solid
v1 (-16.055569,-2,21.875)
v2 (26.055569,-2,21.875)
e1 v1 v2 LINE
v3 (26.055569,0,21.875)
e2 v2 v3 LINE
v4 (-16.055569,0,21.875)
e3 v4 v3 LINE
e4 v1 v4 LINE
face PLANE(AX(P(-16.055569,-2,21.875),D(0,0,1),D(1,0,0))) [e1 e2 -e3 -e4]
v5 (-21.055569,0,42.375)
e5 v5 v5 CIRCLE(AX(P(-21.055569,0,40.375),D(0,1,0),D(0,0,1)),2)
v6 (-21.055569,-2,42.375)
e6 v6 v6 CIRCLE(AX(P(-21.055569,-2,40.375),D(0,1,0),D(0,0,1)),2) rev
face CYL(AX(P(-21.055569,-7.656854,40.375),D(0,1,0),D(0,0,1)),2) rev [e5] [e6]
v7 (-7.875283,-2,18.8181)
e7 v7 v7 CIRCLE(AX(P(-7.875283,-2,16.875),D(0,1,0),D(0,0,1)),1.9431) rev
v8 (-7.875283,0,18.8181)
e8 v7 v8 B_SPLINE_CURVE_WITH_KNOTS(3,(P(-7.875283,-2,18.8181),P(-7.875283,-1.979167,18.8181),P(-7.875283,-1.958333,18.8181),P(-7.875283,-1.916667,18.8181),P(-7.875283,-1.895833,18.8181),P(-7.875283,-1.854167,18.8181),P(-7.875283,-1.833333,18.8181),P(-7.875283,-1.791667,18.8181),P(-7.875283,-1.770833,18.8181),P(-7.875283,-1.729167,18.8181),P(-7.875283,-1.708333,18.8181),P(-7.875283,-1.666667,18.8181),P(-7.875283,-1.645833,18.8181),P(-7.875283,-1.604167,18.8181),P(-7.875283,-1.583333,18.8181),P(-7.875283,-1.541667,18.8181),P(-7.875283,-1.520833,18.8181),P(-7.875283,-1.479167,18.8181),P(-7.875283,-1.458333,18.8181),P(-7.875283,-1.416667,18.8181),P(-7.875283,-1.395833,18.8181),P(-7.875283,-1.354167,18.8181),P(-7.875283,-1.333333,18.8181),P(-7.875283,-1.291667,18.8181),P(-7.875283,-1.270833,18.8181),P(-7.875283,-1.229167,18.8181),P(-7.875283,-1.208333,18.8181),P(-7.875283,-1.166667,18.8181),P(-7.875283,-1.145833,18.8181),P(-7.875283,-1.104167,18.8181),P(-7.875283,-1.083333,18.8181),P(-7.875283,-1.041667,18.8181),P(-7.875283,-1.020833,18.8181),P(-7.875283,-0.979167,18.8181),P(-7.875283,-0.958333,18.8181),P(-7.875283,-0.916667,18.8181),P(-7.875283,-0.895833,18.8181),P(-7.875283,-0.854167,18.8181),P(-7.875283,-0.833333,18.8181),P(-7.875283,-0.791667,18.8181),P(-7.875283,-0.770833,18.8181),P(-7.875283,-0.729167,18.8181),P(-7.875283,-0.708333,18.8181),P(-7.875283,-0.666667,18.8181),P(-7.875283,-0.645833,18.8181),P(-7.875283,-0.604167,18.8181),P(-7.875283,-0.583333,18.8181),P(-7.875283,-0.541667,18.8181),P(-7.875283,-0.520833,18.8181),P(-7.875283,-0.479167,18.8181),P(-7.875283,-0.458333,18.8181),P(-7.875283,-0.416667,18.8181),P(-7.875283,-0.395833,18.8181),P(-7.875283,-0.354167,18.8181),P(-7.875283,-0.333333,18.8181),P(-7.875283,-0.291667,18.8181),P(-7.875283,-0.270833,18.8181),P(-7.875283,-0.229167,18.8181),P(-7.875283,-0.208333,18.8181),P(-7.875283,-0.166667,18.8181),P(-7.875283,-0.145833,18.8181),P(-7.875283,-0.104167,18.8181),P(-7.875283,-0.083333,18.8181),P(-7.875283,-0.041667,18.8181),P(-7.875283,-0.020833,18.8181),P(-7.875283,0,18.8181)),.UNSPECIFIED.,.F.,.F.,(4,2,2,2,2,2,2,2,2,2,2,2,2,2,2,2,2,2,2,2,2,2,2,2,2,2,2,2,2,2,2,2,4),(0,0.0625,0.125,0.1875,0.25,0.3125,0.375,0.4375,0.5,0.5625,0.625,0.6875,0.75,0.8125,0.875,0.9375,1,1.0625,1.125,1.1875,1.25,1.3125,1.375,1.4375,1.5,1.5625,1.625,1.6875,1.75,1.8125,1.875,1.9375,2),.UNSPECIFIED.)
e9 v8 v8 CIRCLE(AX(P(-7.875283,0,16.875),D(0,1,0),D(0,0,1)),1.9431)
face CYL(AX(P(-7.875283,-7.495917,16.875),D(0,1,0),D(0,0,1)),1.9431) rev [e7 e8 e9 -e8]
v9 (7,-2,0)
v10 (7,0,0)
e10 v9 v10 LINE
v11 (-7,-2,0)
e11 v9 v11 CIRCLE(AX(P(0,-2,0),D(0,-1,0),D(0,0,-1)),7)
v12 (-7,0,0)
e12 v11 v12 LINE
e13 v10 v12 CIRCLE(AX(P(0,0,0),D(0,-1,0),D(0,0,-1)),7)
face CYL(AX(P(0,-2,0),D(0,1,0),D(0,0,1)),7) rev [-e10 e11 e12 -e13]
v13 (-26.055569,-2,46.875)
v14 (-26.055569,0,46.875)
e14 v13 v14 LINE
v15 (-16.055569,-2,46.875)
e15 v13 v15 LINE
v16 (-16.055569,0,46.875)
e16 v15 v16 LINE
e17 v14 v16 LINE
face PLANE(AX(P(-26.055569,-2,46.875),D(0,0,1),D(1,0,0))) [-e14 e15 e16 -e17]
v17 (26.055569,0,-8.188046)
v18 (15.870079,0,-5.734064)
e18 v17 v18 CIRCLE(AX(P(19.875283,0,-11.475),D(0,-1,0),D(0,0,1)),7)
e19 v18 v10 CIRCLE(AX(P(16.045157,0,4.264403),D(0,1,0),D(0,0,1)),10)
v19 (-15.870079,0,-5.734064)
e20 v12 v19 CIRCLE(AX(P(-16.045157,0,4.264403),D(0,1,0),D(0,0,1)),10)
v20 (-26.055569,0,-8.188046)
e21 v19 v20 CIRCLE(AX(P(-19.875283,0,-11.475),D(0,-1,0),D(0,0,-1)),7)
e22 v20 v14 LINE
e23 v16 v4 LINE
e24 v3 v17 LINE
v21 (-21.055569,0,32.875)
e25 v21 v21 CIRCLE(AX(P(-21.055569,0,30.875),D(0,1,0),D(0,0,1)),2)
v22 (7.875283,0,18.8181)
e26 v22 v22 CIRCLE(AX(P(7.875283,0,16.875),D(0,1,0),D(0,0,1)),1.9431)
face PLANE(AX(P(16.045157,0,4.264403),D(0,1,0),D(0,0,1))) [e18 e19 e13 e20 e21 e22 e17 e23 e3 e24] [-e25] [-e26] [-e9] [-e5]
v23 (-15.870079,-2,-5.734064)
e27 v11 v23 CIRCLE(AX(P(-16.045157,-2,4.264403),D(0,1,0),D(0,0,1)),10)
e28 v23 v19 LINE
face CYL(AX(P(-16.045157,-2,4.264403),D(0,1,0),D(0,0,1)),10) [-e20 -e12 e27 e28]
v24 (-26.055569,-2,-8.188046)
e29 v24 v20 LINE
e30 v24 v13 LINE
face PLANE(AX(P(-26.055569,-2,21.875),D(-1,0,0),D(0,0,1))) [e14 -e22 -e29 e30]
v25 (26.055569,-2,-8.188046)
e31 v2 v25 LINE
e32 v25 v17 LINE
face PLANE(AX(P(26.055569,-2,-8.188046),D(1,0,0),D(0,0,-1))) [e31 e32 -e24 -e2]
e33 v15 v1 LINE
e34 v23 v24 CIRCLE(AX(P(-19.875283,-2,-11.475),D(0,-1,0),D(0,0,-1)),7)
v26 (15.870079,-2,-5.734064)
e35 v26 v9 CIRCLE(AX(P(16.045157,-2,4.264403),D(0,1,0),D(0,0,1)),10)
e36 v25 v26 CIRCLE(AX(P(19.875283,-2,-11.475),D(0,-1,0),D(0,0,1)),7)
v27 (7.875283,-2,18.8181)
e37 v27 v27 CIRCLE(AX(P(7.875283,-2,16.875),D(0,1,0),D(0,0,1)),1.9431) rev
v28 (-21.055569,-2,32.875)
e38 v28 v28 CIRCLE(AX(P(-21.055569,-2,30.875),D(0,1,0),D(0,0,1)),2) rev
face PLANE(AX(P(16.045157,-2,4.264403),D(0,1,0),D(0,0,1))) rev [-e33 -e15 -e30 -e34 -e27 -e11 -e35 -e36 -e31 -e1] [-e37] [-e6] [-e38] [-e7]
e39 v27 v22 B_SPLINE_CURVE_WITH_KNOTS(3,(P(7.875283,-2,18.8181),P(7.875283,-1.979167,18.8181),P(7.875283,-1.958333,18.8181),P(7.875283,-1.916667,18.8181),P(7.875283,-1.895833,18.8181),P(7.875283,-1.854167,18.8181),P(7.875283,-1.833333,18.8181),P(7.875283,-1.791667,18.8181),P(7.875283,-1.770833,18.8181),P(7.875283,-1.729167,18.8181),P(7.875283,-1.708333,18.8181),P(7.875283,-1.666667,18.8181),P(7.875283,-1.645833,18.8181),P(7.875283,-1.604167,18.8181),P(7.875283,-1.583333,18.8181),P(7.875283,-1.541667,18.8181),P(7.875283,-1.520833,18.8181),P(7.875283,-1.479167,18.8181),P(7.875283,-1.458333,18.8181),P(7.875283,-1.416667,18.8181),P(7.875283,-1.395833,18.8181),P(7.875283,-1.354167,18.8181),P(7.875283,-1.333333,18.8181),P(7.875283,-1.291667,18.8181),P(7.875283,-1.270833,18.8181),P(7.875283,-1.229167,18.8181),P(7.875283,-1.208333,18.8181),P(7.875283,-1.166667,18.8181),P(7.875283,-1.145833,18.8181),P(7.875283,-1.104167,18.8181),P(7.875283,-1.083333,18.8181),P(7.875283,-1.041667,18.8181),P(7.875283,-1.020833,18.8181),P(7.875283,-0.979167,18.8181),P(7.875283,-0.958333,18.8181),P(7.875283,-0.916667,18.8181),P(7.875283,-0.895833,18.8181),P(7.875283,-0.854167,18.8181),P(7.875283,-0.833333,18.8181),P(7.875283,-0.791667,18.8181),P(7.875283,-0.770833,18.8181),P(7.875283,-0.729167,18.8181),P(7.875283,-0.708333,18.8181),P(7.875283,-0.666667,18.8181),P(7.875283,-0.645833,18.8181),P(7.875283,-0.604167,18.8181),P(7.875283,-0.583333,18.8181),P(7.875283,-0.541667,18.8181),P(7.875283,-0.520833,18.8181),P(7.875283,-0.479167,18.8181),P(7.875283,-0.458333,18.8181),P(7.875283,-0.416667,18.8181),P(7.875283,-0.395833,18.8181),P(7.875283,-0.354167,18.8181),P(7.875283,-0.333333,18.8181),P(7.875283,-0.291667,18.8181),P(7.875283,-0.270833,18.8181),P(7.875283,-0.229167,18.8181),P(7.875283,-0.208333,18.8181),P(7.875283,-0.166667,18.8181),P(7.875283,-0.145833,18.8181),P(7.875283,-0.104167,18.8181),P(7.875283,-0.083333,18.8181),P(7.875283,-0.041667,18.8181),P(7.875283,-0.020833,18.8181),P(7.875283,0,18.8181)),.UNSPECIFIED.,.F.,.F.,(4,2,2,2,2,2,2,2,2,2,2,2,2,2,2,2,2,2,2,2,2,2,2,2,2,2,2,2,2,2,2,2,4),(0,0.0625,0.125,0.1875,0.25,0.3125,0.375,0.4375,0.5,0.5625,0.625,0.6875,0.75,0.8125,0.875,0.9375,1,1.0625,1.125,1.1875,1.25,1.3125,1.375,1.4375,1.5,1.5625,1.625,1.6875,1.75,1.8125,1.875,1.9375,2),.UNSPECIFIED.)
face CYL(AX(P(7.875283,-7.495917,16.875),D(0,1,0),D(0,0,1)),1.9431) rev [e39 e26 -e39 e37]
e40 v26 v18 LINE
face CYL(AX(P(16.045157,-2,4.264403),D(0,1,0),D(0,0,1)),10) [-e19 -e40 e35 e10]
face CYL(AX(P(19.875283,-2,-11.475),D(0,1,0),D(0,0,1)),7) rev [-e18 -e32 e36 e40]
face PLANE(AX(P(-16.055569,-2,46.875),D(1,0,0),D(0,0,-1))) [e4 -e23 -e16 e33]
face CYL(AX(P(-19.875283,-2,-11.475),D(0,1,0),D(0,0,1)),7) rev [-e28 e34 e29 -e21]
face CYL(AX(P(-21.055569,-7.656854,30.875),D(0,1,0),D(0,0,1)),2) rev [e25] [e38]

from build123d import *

# Parameters (mm, degrees)
BASE_FLANGE1_DEPTH = 2
SKETCH7_R          = 2
CUT_EXTRUDE1_DEPTH = 2
SKETCH9_R          = 1.9431
CUT_EXTRUDE2_DEPTH = 2


# Sheet-metal steps are written as plain solids
with BuildPart() as part:
    # Sketch2 → Base-Flange1 (new body)
    with BuildSketch(Plane(origin=(0, 0, 0), x_dir=(1, 0, 0), z_dir=(0, 1, 0))):
        with BuildLine():
            Line((-26.055569119, -21.875), (-26.055569119, -46.875))
            Line((-26.055569119, -46.875), (-16.055569119, -46.875))
            Line((-16.055569119, -46.875), (-16.055569119, -21.875))
            Line((-16.055569119, -21.875), (26.055569119, -21.875))
            Line((26.055569119, -21.875), (26.055569119, 8.188046441))
            ThreePointArc((26.055569119, 8.188046441), (21.514872246, 4.669726518), (15.870079226, 5.73406431))
            ThreePointArc((15.870079226, 5.73406431), (10.616247764, 4.133629141), (7, 0))
            ThreePointArc((7, 0), (0, -7), (-7, 0))
            ThreePointArc((-7, 0), (-10.616247764, 4.133629141), (-15.870079226, 5.73406431))
            ThreePointArc((-15.870079226, 5.73406431), (-21.514872246, 4.669726518), (-26.055569119, 8.188046441))
            Line((-26.055569119, 8.188046441), (-26.055569119, -21.875))
        make_face()
    extrude(amount=-BASE_FLANGE1_DEPTH)

    # Sketch7 → Cut-Extrude1 (cut)
    with BuildSketch(Plane(origin=(0, 0, 0), x_dir=(1, 0, 0), z_dir=(0, 1, 0))):
        with Locations(Location((-21.055569119, -40.375, 0), (0, 0, 270))):
            Circle(SKETCH7_R)
        with Locations(Location((-21.055569119, -30.875, 0), (0, 0, 270))):
            Circle(SKETCH7_R)
    extrude(amount=-CUT_EXTRUDE1_DEPTH, mode=Mode.SUBTRACT)

    # Sketch9 → Cut-Extrude2 (cut)
    with BuildSketch(Plane(origin=(0, 0, 0), x_dir=(1, 0, 0), z_dir=(0, 1, 0))):
        with Locations(Location((-7.875283017, -16.875, 0), (0, 0, 270))):
            Circle(SKETCH9_R)
        with Locations(Location((7.875283017, -16.875, 0), (0, 0, 270))):
            Circle(SKETCH9_R)
    extrude(amount=-CUT_EXTRUDE2_DEPTH, mode=Mode.SUBTRACT)


solid = part.part
